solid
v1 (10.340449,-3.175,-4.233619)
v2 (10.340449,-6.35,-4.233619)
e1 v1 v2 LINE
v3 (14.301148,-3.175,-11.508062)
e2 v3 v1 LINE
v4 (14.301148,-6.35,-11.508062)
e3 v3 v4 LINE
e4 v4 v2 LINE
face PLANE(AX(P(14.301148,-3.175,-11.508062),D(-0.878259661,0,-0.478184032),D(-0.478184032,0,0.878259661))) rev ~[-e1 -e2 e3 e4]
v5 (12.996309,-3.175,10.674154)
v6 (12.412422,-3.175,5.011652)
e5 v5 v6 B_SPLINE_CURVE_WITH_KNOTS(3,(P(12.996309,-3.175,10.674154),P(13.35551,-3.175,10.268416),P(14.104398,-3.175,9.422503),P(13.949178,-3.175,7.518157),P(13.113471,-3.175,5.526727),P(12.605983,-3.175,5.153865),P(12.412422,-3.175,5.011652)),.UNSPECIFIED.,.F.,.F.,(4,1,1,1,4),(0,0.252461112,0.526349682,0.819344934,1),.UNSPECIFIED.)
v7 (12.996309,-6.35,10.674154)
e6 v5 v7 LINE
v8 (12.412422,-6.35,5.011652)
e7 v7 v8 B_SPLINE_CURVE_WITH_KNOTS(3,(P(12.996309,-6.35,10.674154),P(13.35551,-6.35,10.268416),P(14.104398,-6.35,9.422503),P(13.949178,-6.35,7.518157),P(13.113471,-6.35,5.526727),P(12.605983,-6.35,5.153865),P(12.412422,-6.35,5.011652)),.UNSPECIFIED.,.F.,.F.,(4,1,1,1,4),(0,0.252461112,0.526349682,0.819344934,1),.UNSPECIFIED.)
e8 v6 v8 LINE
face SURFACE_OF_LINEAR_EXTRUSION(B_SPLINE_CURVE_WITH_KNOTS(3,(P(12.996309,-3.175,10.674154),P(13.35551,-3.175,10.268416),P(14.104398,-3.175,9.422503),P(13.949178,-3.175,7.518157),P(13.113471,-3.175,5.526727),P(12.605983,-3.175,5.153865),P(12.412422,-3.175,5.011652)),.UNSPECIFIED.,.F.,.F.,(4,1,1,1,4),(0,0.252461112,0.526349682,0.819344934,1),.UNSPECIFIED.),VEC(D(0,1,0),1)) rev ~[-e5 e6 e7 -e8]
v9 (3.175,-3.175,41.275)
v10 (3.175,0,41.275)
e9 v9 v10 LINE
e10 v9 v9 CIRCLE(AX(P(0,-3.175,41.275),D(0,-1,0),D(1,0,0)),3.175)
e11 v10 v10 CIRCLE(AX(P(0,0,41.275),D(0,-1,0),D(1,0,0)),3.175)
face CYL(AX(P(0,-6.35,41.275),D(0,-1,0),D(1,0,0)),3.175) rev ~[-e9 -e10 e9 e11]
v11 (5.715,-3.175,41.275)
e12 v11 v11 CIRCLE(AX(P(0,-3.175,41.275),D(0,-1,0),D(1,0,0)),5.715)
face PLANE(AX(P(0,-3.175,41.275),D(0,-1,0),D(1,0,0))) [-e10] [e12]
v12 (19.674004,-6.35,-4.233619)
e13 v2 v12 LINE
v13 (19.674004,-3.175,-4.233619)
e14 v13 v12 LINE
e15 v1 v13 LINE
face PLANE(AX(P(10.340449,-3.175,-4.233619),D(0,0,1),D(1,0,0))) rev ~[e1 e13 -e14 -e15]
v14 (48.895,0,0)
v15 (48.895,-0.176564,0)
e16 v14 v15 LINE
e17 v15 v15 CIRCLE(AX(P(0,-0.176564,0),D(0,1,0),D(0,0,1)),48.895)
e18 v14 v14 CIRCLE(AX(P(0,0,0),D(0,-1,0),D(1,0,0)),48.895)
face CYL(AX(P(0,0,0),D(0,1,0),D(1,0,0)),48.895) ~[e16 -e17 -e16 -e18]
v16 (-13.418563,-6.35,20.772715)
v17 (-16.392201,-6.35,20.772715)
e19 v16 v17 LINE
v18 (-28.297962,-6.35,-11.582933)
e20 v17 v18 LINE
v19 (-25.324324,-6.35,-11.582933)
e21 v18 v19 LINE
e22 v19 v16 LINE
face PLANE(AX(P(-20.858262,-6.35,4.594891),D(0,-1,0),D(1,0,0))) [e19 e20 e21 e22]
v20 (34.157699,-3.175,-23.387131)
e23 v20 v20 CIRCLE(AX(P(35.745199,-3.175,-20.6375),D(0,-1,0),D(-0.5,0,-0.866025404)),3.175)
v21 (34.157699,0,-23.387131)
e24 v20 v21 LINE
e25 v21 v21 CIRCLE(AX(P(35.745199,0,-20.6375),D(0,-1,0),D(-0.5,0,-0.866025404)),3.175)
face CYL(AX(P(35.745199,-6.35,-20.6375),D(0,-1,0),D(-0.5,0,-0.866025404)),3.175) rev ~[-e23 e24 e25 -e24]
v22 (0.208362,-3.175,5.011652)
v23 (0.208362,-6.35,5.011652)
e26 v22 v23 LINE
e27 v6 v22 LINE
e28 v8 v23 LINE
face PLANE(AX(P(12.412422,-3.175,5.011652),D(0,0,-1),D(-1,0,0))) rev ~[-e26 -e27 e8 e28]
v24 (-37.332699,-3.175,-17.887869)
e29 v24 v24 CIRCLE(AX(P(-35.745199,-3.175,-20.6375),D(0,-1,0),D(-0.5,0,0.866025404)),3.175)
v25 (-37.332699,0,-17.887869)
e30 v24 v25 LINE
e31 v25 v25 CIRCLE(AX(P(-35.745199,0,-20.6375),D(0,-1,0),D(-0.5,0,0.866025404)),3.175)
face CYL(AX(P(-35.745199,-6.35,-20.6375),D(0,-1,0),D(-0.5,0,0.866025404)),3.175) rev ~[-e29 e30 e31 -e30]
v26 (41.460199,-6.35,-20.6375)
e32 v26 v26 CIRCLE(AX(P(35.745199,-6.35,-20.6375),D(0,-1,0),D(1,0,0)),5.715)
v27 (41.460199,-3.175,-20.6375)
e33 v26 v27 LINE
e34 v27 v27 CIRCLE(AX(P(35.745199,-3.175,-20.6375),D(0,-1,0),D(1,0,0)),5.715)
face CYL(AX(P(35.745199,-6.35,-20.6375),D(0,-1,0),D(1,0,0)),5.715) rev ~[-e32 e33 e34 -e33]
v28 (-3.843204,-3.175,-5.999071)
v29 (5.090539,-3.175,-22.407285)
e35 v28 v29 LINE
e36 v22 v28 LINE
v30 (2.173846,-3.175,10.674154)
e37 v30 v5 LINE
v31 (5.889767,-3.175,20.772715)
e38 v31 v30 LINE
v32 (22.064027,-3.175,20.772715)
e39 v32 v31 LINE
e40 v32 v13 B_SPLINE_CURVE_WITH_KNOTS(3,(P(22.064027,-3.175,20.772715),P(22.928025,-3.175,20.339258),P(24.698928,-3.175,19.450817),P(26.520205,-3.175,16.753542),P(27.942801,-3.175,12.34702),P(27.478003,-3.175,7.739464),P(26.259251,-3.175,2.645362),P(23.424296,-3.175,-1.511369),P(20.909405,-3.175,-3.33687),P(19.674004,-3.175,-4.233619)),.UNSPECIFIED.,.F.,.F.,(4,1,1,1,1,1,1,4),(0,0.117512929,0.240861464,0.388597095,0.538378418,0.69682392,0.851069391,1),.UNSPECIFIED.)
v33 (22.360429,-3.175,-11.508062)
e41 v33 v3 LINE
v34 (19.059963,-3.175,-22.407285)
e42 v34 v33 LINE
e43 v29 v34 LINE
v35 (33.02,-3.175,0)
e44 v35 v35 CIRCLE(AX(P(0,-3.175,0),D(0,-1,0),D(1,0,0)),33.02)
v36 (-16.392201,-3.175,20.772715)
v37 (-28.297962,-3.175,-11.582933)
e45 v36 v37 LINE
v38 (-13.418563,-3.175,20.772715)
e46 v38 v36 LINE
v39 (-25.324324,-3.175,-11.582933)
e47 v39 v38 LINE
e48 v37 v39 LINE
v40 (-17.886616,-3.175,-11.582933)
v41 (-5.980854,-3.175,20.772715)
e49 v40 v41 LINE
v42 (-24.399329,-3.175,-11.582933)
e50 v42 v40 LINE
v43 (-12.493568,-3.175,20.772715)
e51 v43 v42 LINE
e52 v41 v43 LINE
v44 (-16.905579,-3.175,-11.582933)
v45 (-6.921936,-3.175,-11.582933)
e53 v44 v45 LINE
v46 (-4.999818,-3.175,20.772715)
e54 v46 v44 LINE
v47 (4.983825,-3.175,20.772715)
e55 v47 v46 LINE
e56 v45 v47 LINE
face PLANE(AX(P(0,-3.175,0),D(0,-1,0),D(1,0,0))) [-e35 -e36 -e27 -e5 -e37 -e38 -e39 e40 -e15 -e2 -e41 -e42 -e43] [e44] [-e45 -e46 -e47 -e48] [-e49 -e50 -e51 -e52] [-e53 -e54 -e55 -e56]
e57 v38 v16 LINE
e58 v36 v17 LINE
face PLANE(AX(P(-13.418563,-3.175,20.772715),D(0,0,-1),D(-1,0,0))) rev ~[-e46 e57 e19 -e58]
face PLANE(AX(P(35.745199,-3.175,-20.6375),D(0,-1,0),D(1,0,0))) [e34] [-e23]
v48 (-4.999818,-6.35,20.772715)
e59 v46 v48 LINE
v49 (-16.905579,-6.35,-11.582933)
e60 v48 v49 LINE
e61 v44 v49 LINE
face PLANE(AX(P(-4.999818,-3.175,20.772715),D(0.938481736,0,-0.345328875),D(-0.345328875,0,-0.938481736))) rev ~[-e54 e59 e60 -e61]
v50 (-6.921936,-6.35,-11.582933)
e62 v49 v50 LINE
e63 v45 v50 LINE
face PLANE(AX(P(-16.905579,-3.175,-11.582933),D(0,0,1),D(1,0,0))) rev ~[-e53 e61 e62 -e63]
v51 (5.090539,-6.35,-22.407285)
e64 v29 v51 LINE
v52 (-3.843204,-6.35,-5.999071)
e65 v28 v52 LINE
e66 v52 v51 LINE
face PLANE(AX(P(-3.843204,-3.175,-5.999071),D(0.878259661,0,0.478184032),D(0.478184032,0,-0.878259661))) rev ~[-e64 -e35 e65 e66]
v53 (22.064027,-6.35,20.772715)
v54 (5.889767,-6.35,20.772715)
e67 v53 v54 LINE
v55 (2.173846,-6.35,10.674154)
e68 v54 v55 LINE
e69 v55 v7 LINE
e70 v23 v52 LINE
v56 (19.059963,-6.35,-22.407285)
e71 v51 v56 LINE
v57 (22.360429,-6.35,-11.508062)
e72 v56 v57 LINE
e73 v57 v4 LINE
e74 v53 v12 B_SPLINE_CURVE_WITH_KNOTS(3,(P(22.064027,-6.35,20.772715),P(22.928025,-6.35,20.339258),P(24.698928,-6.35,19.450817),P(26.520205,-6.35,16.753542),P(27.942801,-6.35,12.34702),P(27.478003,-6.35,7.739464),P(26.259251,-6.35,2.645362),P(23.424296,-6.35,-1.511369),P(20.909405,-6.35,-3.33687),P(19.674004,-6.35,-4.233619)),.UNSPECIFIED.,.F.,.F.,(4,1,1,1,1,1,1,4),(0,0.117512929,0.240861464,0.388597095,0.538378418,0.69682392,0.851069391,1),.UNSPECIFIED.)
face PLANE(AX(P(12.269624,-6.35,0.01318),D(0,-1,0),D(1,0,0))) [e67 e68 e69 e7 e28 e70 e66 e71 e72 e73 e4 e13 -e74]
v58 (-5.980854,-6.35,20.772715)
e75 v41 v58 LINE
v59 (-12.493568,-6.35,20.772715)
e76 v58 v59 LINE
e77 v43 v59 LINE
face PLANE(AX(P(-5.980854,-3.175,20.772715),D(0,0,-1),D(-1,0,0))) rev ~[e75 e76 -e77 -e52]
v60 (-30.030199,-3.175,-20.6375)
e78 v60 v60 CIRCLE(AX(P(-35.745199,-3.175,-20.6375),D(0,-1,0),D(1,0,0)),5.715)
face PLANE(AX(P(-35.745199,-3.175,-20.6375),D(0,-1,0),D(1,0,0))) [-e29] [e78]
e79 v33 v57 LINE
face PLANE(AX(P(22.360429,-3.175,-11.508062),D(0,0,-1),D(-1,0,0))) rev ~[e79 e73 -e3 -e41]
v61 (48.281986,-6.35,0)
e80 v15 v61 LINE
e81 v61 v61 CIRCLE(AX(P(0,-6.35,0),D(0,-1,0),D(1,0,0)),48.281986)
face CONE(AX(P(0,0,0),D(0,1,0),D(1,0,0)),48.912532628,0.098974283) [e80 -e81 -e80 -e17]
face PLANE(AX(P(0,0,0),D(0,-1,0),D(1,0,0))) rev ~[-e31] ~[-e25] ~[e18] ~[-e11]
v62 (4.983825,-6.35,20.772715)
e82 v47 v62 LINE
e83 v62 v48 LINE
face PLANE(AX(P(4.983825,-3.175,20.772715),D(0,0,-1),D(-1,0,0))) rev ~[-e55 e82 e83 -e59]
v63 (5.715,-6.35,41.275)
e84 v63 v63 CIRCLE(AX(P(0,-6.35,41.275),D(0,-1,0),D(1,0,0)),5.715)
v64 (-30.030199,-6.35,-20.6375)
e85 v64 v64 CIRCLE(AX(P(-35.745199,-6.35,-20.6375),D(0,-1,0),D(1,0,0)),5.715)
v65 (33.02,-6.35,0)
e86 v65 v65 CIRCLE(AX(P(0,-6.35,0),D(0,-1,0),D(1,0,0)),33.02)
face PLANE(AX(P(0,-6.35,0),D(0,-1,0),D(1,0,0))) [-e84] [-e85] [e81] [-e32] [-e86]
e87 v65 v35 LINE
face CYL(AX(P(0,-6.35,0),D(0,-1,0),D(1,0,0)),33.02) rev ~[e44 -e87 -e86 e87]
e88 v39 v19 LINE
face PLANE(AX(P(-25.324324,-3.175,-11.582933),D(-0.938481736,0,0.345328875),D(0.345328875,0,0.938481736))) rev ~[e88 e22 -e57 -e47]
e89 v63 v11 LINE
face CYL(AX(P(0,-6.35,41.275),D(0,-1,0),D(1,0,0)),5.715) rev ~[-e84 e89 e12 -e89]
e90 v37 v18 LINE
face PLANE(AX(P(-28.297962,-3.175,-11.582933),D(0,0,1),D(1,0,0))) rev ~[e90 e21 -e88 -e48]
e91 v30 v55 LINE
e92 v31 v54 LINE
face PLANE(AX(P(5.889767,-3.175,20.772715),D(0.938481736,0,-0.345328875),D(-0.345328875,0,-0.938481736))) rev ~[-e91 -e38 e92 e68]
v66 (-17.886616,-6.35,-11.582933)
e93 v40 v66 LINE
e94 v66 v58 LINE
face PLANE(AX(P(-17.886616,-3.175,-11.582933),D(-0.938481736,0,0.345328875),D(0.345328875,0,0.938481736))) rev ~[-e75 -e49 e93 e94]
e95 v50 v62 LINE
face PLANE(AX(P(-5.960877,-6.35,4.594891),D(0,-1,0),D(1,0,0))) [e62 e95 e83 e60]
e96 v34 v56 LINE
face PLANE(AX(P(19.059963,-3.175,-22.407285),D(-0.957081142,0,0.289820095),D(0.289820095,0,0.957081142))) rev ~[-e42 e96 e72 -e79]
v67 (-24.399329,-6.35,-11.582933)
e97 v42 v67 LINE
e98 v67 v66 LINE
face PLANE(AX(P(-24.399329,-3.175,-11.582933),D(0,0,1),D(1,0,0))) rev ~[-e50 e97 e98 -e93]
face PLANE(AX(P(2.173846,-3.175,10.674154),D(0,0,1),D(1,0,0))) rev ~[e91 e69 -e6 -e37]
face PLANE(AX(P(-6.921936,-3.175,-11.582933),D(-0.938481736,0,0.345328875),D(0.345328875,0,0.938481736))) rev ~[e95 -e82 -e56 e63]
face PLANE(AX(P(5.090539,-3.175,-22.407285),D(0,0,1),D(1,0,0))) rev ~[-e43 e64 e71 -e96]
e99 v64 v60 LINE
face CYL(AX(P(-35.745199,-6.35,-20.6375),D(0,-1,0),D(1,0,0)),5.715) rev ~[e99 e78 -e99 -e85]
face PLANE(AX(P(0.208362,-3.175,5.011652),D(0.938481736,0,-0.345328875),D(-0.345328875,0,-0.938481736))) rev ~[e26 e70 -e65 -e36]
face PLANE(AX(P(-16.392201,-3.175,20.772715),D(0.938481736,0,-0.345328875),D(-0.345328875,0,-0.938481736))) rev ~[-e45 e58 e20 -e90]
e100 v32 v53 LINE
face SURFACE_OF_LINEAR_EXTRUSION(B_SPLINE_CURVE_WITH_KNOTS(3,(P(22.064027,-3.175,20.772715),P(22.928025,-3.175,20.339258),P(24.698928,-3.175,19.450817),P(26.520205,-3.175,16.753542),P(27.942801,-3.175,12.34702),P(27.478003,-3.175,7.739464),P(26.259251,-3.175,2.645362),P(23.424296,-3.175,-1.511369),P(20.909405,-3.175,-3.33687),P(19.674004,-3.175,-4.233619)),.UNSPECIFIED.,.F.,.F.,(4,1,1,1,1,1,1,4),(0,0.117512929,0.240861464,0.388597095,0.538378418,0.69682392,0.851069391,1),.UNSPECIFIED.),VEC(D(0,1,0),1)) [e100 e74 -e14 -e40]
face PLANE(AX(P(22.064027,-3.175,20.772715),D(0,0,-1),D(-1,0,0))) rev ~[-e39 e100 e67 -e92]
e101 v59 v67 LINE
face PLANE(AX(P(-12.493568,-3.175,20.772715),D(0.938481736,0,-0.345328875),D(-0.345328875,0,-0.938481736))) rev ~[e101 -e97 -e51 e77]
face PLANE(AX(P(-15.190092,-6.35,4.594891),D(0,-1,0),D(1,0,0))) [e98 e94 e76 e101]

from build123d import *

# Parameters (mm, degrees)
F0_R            = 48.895
F1_DEPTH        = 6.35
F2_R            = 33.02
F3_DEPTH        = 3.175
F4_R            = 3.175
F5_DEPTH        = 6.351
F5_COPIES_COUNT = 3
F6_R            = 5.715
F7_DEPTH        = 3.175
F9_DEPTH        = 3.175


# Not quite as in the source:
# - a pattern or mirror of a feature is missing from the dataset's text; its kind, count and spacing are read off the source's solid


with BuildPart() as f1:
    # F0 (on Front) → F1 (new body)
    with BuildSketch(Plane.XZ):
        Circle(F0_R)
    extrude(amount=F1_DEPTH)

    # F2 (on face) → F3 (cut)
    with BuildSketch(Plane.XZ.offset(6.35)):
        Circle(F2_R)
    extrude(amount=-F3_DEPTH, mode=Mode.SUBTRACT)

    # F4 (on face) → F5 (cut, through all)
    with BuildSketch(Plane.XZ.offset(6.35)):
        with Locations((0, 41.275)):
            Circle(F4_R)
    f5 = extrude(amount=-F5_DEPTH, mode=Mode.SUBTRACT)

    # F5_copies: F5 ×3 about axis
    f5_copies_axis = Axis((0, 0, 0), (0, 1, 0))
    for i in range(1, F5_COPIES_COUNT):
        add(f5.rotate(f5_copies_axis, i * 360 / F5_COPIES_COUNT), mode=Mode.SUBTRACT)

    # F6 (on face) → F7 (cut)
    with BuildSketch(Plane.XZ.offset(6.35)):
        with Locations((0, 41.275)):
            Circle(F6_R)
        with Locations((35.7451985412, -20.6375)):
            Circle(F6_R)
        with Locations((-35.7451985412, -20.6375)):
            Circle(F6_R)
    extrude(amount=-F7_DEPTH, mode=Mode.SUBTRACT)

    # F8 (on face) → F9 (join)
    with BuildSketch(Plane.XZ.offset(3.175)):
        Polygon((-16.3922007191, 20.7727154884), (-28.2979620914, -11.5829327573), (-25.324323939, -11.5829327573), (-13.4185625667, 20.7727154884), align=None)
        Polygon((-16.905579319, -11.5829327573), (-6.9219360217, -11.5829327573), (4.9838253506, 20.7727154884), (-4.9998179467, 20.7727154884), align=None)
        Polygon((-12.4935675046, 20.7727154884), (-24.3993288769, -11.5829327573), (-17.8866158386, -11.5829327573), (-5.9808544663, 20.7727154884), align=None)
        with BuildLine():
            Line((5.8897674028, 20.7727154884), (2.173845637, 10.6741544806))
            Line((2.173845637, 10.6741544806), (12.9963092812, 10.6741544806))
            add(Edge.make_bspline(
                [(12.9963092812, 10.6741544806), (13.3555097893, 10.2684161805), (14.1043976934, 9.4225028304), (13.9491779559, 7.5181571268), (13.1134705599, 5.5267271878), (12.6059829763, 5.1538653523), (12.4124220311, 5.0116520418)],
                knots=[0, 0, 0, 0, 0.2524611124, 0.5263496824, 0.8193449335, 1, 1, 1, 1], degree=3))
            Line((12.4124220311, 5.0116520418), (0.2083620148, 5.0116520418))
            Line((0.2083620148, 5.0116520418), (-3.8432038956, -5.9990710312))
            Line((-3.8432038956, -5.9990710312), (5.090538634, -22.4072845116))
            Line((5.090538634, -22.4072845116), (19.059962988, -22.4072845116))
            Line((19.059962988, -22.4072845116), (22.3604289031, -11.5080620742))
            Line((22.3604289031, -11.5080620742), (14.3011480982, -11.5080620742))
            Line((14.3011480982, -11.5080620742), (10.3404486879, -4.2336190018))
            Line((10.3404486879, -4.2336190018), (19.6740036189, -4.2336190018))
            add(Edge.make_bspline(
                [(22.0640265758, 20.7727154884), (22.9280250832, 20.3392576633), (24.6989276358, 19.4508168126), (26.5202053139, 16.7535424772), (27.942801324, 12.3470202028), (27.4780031336, 7.7394644811), (26.2592507252, 2.6453616364), (23.4242960391, -1.5113689868), (20.9094052375, -3.3368697093), (19.6740036189, -4.2336190018)],
                knots=[0, 0, 0, 0, 0.1175129286, 0.2408614638, 0.3885970952, 0.5383784175, 0.6968239202, 0.8510693906, 1, 1, 1, 1], degree=3))
            Line((22.0640265758, 20.7727154884), (5.8897674028, 20.7727154884))
        make_face()
    extrude(amount=F9_DEPTH)

    # F10 (on Top) → F11 (revolve, cut)
    with BuildSketch(Plane.XY):
        Polygon((48.9125326276, -6.3948447905), (48.9125326276, 0), (48.2775326276, -6.3948447905), align=None)
    revolve(axis=Axis((0, -3.4167582635, 0), (0, -1, 0)), mode=Mode.SUBTRACT)


solid = f1.part
